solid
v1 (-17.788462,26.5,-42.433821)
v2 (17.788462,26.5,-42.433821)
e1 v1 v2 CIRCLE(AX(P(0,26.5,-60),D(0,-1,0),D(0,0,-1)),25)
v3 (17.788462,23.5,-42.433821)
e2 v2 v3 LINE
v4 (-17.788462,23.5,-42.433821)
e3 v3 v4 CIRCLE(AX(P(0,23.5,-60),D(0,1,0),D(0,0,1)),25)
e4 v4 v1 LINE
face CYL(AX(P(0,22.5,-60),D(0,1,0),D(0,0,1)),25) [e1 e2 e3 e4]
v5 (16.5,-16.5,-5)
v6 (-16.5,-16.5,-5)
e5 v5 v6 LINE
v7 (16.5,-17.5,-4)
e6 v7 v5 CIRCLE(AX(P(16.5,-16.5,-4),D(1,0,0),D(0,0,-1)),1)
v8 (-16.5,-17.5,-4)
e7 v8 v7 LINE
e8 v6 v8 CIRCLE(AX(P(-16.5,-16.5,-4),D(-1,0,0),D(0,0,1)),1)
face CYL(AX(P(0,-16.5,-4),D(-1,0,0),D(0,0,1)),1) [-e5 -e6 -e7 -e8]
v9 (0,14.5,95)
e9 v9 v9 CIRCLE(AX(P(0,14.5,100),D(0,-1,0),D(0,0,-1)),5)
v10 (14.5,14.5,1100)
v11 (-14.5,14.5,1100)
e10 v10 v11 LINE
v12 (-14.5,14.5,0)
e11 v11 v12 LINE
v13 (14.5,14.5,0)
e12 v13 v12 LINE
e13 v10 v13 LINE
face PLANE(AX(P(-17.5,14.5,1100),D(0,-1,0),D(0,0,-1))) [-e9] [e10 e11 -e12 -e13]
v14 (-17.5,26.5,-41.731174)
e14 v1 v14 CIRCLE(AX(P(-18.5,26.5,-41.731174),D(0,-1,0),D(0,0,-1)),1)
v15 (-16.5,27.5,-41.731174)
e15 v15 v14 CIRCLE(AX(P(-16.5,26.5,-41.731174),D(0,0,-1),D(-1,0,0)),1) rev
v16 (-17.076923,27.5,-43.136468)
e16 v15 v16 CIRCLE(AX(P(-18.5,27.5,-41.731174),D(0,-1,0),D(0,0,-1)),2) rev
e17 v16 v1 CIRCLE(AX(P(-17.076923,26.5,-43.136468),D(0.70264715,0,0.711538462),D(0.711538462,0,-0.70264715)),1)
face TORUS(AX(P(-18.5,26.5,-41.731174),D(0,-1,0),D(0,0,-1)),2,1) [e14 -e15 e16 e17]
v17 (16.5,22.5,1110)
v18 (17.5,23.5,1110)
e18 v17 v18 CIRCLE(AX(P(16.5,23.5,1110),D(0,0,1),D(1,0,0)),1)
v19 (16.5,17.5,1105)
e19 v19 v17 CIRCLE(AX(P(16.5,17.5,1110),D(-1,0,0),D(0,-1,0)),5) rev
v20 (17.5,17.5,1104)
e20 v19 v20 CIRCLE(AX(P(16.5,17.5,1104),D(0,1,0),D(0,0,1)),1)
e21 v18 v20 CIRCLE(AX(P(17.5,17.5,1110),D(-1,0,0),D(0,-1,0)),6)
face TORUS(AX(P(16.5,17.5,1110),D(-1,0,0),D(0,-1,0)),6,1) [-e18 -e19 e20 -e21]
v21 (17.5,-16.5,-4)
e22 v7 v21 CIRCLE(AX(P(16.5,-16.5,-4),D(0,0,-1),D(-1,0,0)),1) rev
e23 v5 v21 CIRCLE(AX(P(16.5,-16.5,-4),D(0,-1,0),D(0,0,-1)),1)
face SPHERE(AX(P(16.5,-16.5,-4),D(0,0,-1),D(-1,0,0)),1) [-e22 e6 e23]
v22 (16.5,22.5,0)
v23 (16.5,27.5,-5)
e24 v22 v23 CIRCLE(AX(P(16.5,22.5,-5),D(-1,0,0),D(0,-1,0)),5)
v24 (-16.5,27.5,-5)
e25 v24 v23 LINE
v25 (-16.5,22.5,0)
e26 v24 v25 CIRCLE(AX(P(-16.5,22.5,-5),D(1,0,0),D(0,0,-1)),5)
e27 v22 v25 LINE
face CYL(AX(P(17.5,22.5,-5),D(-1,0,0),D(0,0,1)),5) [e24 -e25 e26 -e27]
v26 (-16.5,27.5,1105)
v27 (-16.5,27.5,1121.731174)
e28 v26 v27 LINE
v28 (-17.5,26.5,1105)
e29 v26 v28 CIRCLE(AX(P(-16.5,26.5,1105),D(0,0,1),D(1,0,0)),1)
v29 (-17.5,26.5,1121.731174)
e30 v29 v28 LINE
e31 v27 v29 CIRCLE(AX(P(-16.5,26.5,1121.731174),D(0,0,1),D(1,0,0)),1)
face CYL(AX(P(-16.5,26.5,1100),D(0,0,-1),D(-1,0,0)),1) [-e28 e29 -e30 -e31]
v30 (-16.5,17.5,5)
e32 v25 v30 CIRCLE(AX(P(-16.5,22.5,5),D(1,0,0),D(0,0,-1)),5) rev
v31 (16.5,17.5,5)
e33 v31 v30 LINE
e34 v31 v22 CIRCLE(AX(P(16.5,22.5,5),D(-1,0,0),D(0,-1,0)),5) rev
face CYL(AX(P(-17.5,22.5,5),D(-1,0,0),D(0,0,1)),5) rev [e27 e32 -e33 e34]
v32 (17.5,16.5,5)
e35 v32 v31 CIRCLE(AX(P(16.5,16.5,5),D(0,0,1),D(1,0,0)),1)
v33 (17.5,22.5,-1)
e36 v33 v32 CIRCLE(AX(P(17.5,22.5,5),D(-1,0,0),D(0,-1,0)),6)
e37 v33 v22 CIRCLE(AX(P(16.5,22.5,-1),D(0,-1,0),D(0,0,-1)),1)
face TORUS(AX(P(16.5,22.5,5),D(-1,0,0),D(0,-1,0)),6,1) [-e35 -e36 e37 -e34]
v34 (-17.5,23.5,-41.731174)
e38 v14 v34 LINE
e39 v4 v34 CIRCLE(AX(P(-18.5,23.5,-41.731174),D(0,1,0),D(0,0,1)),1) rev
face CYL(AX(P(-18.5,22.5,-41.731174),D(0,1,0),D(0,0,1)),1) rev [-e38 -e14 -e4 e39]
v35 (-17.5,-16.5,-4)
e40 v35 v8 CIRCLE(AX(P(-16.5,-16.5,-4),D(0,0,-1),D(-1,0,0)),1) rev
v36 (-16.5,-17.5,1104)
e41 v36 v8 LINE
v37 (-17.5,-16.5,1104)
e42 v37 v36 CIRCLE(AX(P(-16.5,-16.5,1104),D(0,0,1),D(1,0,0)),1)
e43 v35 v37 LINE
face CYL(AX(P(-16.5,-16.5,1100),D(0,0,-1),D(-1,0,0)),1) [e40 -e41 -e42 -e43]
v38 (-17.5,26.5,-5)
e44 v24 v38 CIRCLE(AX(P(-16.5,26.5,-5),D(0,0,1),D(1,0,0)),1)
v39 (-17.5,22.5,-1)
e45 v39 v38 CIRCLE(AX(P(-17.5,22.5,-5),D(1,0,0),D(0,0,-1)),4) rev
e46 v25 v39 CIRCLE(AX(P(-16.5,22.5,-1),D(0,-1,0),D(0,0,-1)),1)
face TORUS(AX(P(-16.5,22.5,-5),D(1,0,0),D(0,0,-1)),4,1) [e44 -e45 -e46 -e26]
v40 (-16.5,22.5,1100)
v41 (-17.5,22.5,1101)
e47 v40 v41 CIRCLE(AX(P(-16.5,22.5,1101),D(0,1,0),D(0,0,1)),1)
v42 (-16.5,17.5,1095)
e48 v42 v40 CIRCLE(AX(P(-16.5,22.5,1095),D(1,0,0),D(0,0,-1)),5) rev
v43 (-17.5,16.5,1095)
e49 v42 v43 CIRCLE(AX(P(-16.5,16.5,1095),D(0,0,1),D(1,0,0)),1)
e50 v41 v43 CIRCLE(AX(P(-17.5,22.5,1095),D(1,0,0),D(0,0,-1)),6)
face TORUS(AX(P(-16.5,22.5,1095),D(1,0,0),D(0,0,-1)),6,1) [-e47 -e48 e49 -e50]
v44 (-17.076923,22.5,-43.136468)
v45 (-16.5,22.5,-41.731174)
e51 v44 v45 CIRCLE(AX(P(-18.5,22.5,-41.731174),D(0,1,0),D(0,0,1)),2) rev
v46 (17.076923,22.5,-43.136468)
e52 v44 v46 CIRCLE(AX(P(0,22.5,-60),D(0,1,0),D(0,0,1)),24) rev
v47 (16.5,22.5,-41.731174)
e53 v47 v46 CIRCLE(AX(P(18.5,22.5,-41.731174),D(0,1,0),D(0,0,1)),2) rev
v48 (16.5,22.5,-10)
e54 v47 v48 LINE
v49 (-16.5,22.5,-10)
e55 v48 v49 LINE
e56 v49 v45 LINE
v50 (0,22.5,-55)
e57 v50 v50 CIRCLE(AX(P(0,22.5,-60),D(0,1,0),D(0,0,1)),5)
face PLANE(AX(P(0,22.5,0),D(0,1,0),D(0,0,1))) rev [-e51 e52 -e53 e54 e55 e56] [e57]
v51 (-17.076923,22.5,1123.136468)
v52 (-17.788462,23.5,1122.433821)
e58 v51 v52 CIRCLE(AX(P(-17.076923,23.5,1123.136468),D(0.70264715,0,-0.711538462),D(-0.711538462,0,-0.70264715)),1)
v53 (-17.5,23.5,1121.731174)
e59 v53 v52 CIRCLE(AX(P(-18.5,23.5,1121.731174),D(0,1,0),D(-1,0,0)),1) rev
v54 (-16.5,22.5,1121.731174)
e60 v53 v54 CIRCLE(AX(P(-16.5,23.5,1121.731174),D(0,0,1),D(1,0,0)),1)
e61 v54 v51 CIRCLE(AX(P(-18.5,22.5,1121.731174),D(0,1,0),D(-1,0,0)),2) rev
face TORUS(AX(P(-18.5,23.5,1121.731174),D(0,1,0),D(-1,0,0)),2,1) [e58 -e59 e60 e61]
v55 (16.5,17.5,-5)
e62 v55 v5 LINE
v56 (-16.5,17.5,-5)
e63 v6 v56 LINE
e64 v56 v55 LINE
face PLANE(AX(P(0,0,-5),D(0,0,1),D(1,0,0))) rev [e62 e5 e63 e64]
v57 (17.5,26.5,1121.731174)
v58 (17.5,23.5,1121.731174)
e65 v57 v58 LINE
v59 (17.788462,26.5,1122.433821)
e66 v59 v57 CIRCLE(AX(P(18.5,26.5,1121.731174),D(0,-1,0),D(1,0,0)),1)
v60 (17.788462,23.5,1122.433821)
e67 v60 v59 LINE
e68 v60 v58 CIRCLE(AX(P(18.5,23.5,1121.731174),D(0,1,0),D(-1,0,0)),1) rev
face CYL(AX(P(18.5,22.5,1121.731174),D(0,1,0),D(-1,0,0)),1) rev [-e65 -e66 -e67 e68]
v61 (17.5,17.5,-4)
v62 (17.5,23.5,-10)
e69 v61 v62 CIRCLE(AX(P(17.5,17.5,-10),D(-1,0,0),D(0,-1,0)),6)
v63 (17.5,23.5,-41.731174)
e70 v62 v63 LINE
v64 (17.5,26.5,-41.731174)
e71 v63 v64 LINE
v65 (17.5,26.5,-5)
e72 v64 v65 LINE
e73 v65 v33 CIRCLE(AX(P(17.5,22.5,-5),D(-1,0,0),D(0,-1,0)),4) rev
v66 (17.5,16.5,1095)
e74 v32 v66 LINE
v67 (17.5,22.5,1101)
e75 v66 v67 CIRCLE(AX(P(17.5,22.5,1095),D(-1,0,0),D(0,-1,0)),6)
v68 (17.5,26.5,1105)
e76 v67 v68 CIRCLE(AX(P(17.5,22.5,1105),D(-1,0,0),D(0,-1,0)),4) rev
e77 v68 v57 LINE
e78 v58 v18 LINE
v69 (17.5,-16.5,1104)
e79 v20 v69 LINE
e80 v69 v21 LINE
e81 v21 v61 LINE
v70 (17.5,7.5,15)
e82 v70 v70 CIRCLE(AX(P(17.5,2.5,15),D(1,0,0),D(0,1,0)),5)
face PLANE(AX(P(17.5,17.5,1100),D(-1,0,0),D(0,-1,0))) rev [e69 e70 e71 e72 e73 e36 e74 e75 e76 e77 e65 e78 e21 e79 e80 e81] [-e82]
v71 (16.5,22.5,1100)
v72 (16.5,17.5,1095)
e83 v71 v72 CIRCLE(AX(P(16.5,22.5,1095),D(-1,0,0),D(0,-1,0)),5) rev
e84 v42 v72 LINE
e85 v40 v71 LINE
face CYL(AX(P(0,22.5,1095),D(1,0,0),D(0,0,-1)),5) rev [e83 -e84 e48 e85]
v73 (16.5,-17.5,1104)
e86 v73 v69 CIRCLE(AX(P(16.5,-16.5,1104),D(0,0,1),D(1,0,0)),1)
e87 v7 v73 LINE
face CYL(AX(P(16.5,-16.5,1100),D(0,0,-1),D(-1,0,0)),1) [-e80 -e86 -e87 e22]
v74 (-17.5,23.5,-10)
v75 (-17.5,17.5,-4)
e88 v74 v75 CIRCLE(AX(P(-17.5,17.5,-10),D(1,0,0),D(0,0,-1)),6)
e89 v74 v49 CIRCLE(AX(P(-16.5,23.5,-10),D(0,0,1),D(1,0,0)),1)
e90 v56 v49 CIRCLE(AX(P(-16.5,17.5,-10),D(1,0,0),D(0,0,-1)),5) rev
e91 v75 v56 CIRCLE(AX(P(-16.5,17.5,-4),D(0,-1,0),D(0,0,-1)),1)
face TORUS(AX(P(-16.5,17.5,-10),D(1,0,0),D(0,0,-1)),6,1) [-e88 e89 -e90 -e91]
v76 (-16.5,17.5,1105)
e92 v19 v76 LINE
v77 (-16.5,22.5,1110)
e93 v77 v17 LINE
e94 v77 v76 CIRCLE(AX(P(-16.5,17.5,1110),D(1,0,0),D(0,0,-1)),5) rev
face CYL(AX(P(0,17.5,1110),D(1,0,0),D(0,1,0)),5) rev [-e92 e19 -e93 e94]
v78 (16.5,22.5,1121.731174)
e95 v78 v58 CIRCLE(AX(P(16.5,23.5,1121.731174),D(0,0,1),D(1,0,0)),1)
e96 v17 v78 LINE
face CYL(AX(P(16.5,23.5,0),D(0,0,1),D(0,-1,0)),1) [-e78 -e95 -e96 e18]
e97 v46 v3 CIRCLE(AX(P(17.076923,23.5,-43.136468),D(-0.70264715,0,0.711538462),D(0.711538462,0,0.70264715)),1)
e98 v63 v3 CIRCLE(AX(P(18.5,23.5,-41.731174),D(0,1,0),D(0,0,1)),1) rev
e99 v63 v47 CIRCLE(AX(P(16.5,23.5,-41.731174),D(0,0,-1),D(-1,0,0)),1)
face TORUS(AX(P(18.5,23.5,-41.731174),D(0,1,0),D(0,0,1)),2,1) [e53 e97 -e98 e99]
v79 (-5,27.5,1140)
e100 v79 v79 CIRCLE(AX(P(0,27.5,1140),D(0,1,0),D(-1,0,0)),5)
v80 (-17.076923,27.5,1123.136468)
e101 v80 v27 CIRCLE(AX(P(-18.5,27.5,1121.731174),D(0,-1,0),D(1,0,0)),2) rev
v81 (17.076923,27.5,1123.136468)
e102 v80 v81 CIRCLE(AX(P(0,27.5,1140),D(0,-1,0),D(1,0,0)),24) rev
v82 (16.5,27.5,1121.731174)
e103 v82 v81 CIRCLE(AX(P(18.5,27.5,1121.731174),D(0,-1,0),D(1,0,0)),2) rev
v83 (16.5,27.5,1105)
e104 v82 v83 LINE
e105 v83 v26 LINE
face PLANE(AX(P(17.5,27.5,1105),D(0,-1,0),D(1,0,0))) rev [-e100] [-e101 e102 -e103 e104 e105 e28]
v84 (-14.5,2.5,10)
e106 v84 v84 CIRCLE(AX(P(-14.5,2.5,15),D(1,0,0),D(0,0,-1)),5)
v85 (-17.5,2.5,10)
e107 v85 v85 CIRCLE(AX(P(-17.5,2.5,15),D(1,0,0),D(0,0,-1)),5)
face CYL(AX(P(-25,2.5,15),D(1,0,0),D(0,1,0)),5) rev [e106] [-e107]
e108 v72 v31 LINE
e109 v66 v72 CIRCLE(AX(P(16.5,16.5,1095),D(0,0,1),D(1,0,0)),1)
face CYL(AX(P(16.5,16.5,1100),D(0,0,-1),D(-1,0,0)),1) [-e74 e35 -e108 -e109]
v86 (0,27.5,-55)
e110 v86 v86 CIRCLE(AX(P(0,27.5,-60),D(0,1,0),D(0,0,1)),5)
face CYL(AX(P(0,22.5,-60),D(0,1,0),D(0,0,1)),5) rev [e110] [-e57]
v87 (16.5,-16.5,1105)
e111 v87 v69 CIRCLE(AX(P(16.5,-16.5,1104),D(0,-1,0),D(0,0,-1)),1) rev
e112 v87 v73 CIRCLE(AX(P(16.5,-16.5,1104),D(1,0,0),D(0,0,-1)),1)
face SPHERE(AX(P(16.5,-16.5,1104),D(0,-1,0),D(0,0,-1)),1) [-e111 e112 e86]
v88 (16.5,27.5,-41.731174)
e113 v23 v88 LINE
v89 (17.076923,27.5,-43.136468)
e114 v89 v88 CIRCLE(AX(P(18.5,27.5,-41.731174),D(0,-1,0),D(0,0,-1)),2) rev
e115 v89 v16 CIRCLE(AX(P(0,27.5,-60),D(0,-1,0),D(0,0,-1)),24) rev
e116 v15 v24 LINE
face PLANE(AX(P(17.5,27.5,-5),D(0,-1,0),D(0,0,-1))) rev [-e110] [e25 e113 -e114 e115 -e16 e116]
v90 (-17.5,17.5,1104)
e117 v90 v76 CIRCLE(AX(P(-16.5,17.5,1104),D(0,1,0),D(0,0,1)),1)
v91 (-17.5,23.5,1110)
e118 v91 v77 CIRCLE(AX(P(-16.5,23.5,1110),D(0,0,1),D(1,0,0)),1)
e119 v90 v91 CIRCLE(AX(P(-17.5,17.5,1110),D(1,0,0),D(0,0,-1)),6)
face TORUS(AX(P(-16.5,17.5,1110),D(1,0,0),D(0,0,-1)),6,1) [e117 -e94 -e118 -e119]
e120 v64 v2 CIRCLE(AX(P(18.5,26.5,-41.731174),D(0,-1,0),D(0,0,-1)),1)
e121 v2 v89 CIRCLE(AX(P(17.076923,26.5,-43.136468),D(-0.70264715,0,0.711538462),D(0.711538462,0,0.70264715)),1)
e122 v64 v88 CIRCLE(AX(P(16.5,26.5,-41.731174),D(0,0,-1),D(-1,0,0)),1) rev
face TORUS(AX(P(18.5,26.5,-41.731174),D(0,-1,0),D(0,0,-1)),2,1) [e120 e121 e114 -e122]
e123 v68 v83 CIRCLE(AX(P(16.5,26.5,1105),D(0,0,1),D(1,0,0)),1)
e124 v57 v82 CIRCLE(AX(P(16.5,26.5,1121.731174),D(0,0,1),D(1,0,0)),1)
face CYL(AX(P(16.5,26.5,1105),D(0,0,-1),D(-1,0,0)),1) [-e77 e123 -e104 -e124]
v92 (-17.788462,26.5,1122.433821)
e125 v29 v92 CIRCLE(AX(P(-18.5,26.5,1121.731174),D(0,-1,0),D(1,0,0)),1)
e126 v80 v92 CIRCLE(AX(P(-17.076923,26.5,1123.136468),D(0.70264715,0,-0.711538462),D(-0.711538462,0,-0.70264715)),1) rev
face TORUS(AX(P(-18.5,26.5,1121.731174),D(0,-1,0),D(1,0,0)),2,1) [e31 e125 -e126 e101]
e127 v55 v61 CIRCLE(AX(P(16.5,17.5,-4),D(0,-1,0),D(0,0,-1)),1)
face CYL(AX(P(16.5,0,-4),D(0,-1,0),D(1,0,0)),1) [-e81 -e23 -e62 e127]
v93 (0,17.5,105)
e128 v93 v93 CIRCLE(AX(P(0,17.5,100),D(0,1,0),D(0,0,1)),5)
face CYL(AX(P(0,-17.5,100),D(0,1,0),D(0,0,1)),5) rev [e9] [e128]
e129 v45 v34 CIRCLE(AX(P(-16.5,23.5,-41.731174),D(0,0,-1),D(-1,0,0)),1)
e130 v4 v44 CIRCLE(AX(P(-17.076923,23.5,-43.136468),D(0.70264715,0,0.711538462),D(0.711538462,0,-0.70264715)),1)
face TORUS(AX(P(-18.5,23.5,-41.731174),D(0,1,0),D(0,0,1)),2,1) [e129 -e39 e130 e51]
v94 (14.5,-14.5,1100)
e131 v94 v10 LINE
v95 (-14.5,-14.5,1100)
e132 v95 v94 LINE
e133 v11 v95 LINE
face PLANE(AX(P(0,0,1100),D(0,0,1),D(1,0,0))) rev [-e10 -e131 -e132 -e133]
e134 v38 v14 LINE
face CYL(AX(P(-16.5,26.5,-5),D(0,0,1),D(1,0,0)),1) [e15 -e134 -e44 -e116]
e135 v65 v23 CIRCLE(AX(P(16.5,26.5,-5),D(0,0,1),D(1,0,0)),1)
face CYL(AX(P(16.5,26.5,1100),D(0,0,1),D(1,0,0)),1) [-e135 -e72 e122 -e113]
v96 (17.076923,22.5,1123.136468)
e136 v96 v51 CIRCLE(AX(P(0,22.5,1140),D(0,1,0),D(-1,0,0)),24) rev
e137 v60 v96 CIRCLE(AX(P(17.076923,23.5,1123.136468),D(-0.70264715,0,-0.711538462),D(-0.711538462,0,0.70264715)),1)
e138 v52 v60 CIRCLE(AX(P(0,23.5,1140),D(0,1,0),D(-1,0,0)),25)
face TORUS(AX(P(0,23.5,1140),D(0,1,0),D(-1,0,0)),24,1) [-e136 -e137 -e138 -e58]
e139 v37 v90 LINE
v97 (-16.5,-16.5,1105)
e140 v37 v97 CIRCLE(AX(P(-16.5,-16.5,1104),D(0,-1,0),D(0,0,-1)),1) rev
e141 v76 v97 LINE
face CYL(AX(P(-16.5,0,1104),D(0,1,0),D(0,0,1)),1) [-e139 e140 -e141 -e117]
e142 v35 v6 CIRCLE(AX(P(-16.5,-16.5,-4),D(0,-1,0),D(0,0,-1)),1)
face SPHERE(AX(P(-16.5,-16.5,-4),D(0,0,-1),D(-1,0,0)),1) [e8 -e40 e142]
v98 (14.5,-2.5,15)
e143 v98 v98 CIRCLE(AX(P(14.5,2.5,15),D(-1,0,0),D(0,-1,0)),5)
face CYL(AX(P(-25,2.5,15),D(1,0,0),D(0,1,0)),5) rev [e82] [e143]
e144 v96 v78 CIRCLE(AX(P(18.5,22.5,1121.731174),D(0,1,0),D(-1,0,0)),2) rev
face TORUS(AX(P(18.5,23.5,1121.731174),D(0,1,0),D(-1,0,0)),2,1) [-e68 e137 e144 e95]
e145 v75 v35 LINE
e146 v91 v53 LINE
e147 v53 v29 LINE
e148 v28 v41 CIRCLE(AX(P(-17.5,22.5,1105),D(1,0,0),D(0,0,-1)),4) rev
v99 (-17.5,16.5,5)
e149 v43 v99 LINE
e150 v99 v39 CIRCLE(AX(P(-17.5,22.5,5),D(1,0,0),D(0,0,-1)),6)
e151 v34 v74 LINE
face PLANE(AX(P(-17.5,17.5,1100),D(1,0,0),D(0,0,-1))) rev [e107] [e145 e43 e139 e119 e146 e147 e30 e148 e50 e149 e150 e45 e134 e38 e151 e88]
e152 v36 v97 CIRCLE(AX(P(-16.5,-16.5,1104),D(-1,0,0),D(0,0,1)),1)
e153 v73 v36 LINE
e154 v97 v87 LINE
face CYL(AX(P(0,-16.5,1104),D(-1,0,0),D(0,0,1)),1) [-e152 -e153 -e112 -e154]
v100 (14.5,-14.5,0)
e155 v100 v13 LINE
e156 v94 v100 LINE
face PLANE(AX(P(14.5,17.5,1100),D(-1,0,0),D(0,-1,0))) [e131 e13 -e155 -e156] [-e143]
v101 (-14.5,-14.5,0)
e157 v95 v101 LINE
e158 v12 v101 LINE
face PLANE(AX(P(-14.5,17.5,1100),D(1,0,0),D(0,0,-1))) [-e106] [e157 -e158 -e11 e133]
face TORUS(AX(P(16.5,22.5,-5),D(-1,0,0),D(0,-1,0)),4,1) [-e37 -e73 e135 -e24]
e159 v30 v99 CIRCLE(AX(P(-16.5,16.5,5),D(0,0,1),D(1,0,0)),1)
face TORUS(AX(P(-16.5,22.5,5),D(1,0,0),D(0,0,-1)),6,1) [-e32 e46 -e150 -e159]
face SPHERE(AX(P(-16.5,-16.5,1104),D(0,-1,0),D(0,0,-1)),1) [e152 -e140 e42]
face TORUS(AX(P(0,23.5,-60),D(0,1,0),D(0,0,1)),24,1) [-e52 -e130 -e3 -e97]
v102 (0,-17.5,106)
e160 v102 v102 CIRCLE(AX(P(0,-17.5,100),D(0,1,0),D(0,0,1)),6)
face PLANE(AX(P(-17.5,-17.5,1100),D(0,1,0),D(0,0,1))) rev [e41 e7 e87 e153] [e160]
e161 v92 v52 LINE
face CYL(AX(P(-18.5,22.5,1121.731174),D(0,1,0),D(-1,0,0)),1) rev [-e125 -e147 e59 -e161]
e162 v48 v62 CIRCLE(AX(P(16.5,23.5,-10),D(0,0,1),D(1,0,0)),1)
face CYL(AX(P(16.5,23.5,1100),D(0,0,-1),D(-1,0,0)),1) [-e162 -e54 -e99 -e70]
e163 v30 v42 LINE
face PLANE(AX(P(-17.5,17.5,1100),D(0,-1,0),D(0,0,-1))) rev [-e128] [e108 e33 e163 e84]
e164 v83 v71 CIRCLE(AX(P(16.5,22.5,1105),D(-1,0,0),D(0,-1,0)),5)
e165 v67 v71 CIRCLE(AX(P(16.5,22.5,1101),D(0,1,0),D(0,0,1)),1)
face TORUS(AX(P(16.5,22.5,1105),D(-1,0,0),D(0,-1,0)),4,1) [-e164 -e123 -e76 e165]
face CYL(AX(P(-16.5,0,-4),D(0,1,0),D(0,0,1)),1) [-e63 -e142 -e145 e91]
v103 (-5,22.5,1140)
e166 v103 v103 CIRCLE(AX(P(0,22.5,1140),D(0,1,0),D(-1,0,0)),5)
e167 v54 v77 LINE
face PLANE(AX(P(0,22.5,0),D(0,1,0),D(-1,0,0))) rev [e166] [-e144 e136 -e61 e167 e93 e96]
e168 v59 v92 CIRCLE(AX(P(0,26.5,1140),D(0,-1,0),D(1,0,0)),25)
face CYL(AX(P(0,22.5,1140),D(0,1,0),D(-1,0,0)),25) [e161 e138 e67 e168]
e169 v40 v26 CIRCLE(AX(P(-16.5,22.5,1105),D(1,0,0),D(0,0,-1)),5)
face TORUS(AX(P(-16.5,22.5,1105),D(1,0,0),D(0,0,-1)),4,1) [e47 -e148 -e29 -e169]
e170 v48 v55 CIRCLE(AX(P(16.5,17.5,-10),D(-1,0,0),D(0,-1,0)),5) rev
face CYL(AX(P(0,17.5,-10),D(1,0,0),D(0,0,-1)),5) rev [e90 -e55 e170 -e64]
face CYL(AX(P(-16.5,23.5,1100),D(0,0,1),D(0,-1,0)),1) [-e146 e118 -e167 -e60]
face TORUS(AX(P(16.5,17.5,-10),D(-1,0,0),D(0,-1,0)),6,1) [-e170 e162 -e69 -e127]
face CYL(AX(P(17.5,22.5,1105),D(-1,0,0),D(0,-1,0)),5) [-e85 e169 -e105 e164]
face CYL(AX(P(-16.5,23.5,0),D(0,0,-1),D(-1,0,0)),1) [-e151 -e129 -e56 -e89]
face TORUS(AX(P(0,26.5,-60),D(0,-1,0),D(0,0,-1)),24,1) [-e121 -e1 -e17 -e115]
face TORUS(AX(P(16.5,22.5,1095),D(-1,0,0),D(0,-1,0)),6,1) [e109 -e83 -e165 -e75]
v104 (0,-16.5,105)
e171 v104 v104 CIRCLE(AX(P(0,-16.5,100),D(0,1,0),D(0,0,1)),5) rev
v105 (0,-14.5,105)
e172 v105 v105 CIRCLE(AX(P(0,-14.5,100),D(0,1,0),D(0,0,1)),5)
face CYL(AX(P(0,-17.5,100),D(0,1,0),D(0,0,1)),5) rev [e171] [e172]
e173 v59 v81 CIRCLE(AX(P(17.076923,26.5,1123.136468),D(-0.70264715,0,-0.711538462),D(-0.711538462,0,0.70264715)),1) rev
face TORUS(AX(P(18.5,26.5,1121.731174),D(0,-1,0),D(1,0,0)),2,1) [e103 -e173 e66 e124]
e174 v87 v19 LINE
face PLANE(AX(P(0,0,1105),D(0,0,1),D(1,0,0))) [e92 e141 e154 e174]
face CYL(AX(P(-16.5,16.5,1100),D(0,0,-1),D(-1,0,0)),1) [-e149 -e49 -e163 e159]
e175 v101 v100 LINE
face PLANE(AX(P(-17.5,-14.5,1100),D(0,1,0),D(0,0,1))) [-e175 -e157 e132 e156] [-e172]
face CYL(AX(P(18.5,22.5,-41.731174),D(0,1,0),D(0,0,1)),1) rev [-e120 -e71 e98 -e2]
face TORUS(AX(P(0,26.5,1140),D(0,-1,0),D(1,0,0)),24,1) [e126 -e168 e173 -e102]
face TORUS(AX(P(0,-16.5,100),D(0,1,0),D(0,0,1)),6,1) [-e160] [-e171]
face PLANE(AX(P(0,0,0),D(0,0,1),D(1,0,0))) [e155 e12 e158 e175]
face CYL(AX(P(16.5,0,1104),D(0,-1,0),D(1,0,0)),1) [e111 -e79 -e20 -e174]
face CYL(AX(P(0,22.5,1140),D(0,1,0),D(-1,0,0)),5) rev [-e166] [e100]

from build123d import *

# Parameters (mm, degrees)
SKETCH_1_W          = 35
SKETCH_1_H          = 35
SKETCH_1_W_2        = 29
SKETCH_1_H_2        = 29
EXTRUDE_1_DEPTH     = 1100
SKETCH_2_W          = 35
SKETCH_2_H          = 45
EXTRUDE_1_2_DEPTH   = 5
EXTRUDE_2_DEPTH     = 5
SKETCH_5_R          = 5
CUT_EXTRUDE_1_DEPTH = 1166.793721033
SKETCH_7_W          = 35
SKETCH_7_H          = 45
EXTRUDE_3_DEPTH     = 5
EXTRUDE_4_DEPTH     = 5
FILLET_1_R          = 5
FILLET_2_R          = 1
SKETCH_9_R          = 5
CUT_EXTRUDE_2_DEPTH = 1167.09926689


with BuildPart() as part:
    # 草图1 → Extrude 1 (new body)
    with BuildSketch(Plane.XY):
        Rectangle(SKETCH_1_W, SKETCH_1_H)
        Rectangle(SKETCH_1_W_2, SKETCH_1_H_2, mode=Mode.SUBTRACT)
    extrude(amount=EXTRUDE_1_DEPTH)

    # 草图2 → Extrude 1 2 (add)
    with BuildSketch(Plane.XY.offset(1100)):
        with Locations((0, 5)):
            Rectangle(SKETCH_2_W, SKETCH_2_H)
    extrude(amount=EXTRUDE_1_2_DEPTH)

    # 草图6 → 凸台-拉伸2 (add)
    with BuildSketch(Plane(origin=(0, 27.5, 0), x_dir=(1, 0, 0), z_dir=(0, 1, 0))):
        with BuildLine():
            Line((17.5, -1105), (-17.5, -1105))
            Line((-17.5, -1105), (-17.5, -1122.146428929))
            ThreePointArc((-17.5, -1122.146428929), (0, -1115), (17.5, -1122.146428929))
            Line((17.5, -1122.146428929), (17.5, -1105))
        make_face()
        with BuildLine():
            ThreePointArc((17.5, -1122.146428929), (0, -1115), (-17.5, -1122.146428929))
            Line((-17.5, -1122.146428929), (-17.5, -1140))
            Line((-17.5, -1140), (-5, -1140))
            ThreePointArc((-5, -1140), (0, -1135), (5, -1140))
            Line((5, -1140), (17.5, -1140))
            Line((17.5, -1140), (17.5, -1122.146428929))
        make_face()
        with BuildLine():
            Line((-17.5, -1140), (-17.5, -1122.146428929))
            ThreePointArc((-17.5, -1122.146428929), (-9.682458366, -1163.048861143), (25, -1140))
            ThreePointArc((25, -1140), (23.048861143, -1130.317541634), (17.5, -1122.146428929))
            Line((17.5, -1122.146428929), (17.5, -1140))
            Line((17.5, -1140), (5, -1140))
            ThreePointArc((5, -1140), (0, -1145), (-5, -1140))
            Line((-5, -1140), (-17.5, -1140))
        make_face()
    extrude(amount=-EXTRUDE_2_DEPTH)

    # 草图5 → 切除-拉伸1 (cut, through all)
    with BuildSketch(Plane(origin=(0, 17.5, 0), x_dir=(1, 0, 0), z_dir=(0, 1, 0))):
        with Locations(Location((0, -100, 0), (0, 0, 270))):
            Circle(SKETCH_5_R)
    extrude(amount=-CUT_EXTRUDE_1_DEPTH, mode=Mode.SUBTRACT)

    # 草图7 → 凸台-拉伸3 (add)
    with BuildSketch(Plane(origin=(0, 0, 0), x_dir=(-1, 0, 0), z_dir=(0, 0, -1))):
        with Locations((0, 5)):
            Rectangle(SKETCH_7_W, SKETCH_7_H)
    extrude(amount=EXTRUDE_3_DEPTH)

    # 草图8 → 凸台-拉伸4 (add)
    with BuildSketch(Plane(origin=(0, 27.5, 0), x_dir=(1, 0, 0), z_dir=(0, 1, 0))):
        with BuildLine():
            Line((-17.5, 5), (17.5, 5))
            Line((17.5, 5), (17.5, 42.146428929))
            ThreePointArc((17.5, 42.146428929), (0, 35), (-17.5, 42.146428929))
            Line((-17.5, 42.146428929), (-17.5, 5))
        make_face()
        with BuildLine():
            ThreePointArc((-17.5, 42.146428929), (0, 35), (17.5, 42.146428929))
            Line((17.5, 42.146428929), (17.5, 60))
            Line((17.5, 60), (5, 60))
            ThreePointArc((5, 60), (0, 55), (-5, 60))
            Line((-5, 60), (-17.5, 60))
            Line((-17.5, 60), (-17.5, 42.146428929))
        make_face()
        with BuildLine():
            Line((17.5, 60), (17.5, 42.146428929))
            ThreePointArc((17.5, 42.146428929), (23.048861143, 50.317541634), (25, 60))
            ThreePointArc((25, 60), (-9.682458366, 83.048861143), (-17.5, 42.146428929))
            Line((-17.5, 42.146428929), (-17.5, 60))
            Line((-17.5, 60), (-5, 60))
            ThreePointArc((-5, 60), (0, 65), (5, 60))
            Line((5, 60), (17.5, 60))
        make_face()
    extrude(amount=-EXTRUDE_4_DEPTH)

    # 圆角1
    fillet_1_edges = [part.edges().sort_by_distance(p)[0] for p in [
        (0, 17.5, 0),
        (0, 22.5, -5),
        (0, 27.5, 0),
        (0, 17.5, 1100),
        (0, 22.5, 1105),
        (0, 27.5, 1100),
    ]]
    fillet(fillet_1_edges, radius=FILLET_1_R - 0.0001)  # a hair under: the kernel refuses the full size

    # 圆角2
    fillet_2_edges = [part.edges().sort_by_distance(p)[0] for p in [
        (-17.5, 17.5, 550),
        (17.5, 17.5, 550),
        (17.5, 22.5, -26.073164464),
        (-17.5, 22.5, -26.073164464),
        (17.5, 5e-05, -5),
        (17.5, 22.5, 1116.073164464),
        (17.5, 26.035563195, 1101.464436805),
        (17.5, 26.035563195, -1.464436805),
        (-17.5, 5e-05, 1105),
        (-17.5, 22.5, 1116.073164464),
        (-17.5, 26.035563195, 1101.464436805),
        (-17.5, 26.035563195, -1.464436805),
        (-17.5, 18.964436805, 1.464436805),
        (17.5, 18.964436805, 1.464436805),
        (-17.5, 21.035563195, -6.464436805),
        (17.5, 21.035563195, -6.464436805),
        (-17.5, 18.964436805, 1098.535563195),
        (17.5, 18.964436805, 1098.535563195),
        (17.5, 21.035563195, 1106.464436805),
        (-17.5, 21.035563195, 1106.464436805),
        (17.5, 27.5, 1113.573164464),
        (-17.5, 27.5, 1113.573164464),
        (17.5, 5e-05, 1105),
        (0, -17.5, 1105),
        (-17.5, 25, 1122.146428929),
        (-9.682458366, 22.5, 1163.048861143),
        (17.5, 25, 1122.146428929),
        (-9.682458366, 27.5, 1163.048861143),
        (17.5, -17.5, 550),
        (0, -17.5, 95),
        (-17.5, -17.5, 550),
        (17.5, 27.5, -23.573164464),
        (-17.5, 27.5, -23.573164464),
        (0, -17.5, -5),
        (-17.5, 5e-05, -5),
        (17.5, 25, -42.146428929),
        (0, 22.5, -85),
        (-17.5, 25, -42.146428929),
        (0, 27.5, -85),
    ]]
    fillet(fillet_2_edges, radius=FILLET_2_R)

    # 草图9 → 切除-拉伸2 (cut, through all)
    with BuildSketch(Plane(origin=(17.5, 0, 0), x_dir=(0, 0, -1), z_dir=(1, 0, 0))):
        with Locations((-15, 2.5)):
            Circle(SKETCH_9_R)
    extrude(amount=-CUT_EXTRUDE_2_DEPTH, mode=Mode.SUBTRACT)


solid = part.part
